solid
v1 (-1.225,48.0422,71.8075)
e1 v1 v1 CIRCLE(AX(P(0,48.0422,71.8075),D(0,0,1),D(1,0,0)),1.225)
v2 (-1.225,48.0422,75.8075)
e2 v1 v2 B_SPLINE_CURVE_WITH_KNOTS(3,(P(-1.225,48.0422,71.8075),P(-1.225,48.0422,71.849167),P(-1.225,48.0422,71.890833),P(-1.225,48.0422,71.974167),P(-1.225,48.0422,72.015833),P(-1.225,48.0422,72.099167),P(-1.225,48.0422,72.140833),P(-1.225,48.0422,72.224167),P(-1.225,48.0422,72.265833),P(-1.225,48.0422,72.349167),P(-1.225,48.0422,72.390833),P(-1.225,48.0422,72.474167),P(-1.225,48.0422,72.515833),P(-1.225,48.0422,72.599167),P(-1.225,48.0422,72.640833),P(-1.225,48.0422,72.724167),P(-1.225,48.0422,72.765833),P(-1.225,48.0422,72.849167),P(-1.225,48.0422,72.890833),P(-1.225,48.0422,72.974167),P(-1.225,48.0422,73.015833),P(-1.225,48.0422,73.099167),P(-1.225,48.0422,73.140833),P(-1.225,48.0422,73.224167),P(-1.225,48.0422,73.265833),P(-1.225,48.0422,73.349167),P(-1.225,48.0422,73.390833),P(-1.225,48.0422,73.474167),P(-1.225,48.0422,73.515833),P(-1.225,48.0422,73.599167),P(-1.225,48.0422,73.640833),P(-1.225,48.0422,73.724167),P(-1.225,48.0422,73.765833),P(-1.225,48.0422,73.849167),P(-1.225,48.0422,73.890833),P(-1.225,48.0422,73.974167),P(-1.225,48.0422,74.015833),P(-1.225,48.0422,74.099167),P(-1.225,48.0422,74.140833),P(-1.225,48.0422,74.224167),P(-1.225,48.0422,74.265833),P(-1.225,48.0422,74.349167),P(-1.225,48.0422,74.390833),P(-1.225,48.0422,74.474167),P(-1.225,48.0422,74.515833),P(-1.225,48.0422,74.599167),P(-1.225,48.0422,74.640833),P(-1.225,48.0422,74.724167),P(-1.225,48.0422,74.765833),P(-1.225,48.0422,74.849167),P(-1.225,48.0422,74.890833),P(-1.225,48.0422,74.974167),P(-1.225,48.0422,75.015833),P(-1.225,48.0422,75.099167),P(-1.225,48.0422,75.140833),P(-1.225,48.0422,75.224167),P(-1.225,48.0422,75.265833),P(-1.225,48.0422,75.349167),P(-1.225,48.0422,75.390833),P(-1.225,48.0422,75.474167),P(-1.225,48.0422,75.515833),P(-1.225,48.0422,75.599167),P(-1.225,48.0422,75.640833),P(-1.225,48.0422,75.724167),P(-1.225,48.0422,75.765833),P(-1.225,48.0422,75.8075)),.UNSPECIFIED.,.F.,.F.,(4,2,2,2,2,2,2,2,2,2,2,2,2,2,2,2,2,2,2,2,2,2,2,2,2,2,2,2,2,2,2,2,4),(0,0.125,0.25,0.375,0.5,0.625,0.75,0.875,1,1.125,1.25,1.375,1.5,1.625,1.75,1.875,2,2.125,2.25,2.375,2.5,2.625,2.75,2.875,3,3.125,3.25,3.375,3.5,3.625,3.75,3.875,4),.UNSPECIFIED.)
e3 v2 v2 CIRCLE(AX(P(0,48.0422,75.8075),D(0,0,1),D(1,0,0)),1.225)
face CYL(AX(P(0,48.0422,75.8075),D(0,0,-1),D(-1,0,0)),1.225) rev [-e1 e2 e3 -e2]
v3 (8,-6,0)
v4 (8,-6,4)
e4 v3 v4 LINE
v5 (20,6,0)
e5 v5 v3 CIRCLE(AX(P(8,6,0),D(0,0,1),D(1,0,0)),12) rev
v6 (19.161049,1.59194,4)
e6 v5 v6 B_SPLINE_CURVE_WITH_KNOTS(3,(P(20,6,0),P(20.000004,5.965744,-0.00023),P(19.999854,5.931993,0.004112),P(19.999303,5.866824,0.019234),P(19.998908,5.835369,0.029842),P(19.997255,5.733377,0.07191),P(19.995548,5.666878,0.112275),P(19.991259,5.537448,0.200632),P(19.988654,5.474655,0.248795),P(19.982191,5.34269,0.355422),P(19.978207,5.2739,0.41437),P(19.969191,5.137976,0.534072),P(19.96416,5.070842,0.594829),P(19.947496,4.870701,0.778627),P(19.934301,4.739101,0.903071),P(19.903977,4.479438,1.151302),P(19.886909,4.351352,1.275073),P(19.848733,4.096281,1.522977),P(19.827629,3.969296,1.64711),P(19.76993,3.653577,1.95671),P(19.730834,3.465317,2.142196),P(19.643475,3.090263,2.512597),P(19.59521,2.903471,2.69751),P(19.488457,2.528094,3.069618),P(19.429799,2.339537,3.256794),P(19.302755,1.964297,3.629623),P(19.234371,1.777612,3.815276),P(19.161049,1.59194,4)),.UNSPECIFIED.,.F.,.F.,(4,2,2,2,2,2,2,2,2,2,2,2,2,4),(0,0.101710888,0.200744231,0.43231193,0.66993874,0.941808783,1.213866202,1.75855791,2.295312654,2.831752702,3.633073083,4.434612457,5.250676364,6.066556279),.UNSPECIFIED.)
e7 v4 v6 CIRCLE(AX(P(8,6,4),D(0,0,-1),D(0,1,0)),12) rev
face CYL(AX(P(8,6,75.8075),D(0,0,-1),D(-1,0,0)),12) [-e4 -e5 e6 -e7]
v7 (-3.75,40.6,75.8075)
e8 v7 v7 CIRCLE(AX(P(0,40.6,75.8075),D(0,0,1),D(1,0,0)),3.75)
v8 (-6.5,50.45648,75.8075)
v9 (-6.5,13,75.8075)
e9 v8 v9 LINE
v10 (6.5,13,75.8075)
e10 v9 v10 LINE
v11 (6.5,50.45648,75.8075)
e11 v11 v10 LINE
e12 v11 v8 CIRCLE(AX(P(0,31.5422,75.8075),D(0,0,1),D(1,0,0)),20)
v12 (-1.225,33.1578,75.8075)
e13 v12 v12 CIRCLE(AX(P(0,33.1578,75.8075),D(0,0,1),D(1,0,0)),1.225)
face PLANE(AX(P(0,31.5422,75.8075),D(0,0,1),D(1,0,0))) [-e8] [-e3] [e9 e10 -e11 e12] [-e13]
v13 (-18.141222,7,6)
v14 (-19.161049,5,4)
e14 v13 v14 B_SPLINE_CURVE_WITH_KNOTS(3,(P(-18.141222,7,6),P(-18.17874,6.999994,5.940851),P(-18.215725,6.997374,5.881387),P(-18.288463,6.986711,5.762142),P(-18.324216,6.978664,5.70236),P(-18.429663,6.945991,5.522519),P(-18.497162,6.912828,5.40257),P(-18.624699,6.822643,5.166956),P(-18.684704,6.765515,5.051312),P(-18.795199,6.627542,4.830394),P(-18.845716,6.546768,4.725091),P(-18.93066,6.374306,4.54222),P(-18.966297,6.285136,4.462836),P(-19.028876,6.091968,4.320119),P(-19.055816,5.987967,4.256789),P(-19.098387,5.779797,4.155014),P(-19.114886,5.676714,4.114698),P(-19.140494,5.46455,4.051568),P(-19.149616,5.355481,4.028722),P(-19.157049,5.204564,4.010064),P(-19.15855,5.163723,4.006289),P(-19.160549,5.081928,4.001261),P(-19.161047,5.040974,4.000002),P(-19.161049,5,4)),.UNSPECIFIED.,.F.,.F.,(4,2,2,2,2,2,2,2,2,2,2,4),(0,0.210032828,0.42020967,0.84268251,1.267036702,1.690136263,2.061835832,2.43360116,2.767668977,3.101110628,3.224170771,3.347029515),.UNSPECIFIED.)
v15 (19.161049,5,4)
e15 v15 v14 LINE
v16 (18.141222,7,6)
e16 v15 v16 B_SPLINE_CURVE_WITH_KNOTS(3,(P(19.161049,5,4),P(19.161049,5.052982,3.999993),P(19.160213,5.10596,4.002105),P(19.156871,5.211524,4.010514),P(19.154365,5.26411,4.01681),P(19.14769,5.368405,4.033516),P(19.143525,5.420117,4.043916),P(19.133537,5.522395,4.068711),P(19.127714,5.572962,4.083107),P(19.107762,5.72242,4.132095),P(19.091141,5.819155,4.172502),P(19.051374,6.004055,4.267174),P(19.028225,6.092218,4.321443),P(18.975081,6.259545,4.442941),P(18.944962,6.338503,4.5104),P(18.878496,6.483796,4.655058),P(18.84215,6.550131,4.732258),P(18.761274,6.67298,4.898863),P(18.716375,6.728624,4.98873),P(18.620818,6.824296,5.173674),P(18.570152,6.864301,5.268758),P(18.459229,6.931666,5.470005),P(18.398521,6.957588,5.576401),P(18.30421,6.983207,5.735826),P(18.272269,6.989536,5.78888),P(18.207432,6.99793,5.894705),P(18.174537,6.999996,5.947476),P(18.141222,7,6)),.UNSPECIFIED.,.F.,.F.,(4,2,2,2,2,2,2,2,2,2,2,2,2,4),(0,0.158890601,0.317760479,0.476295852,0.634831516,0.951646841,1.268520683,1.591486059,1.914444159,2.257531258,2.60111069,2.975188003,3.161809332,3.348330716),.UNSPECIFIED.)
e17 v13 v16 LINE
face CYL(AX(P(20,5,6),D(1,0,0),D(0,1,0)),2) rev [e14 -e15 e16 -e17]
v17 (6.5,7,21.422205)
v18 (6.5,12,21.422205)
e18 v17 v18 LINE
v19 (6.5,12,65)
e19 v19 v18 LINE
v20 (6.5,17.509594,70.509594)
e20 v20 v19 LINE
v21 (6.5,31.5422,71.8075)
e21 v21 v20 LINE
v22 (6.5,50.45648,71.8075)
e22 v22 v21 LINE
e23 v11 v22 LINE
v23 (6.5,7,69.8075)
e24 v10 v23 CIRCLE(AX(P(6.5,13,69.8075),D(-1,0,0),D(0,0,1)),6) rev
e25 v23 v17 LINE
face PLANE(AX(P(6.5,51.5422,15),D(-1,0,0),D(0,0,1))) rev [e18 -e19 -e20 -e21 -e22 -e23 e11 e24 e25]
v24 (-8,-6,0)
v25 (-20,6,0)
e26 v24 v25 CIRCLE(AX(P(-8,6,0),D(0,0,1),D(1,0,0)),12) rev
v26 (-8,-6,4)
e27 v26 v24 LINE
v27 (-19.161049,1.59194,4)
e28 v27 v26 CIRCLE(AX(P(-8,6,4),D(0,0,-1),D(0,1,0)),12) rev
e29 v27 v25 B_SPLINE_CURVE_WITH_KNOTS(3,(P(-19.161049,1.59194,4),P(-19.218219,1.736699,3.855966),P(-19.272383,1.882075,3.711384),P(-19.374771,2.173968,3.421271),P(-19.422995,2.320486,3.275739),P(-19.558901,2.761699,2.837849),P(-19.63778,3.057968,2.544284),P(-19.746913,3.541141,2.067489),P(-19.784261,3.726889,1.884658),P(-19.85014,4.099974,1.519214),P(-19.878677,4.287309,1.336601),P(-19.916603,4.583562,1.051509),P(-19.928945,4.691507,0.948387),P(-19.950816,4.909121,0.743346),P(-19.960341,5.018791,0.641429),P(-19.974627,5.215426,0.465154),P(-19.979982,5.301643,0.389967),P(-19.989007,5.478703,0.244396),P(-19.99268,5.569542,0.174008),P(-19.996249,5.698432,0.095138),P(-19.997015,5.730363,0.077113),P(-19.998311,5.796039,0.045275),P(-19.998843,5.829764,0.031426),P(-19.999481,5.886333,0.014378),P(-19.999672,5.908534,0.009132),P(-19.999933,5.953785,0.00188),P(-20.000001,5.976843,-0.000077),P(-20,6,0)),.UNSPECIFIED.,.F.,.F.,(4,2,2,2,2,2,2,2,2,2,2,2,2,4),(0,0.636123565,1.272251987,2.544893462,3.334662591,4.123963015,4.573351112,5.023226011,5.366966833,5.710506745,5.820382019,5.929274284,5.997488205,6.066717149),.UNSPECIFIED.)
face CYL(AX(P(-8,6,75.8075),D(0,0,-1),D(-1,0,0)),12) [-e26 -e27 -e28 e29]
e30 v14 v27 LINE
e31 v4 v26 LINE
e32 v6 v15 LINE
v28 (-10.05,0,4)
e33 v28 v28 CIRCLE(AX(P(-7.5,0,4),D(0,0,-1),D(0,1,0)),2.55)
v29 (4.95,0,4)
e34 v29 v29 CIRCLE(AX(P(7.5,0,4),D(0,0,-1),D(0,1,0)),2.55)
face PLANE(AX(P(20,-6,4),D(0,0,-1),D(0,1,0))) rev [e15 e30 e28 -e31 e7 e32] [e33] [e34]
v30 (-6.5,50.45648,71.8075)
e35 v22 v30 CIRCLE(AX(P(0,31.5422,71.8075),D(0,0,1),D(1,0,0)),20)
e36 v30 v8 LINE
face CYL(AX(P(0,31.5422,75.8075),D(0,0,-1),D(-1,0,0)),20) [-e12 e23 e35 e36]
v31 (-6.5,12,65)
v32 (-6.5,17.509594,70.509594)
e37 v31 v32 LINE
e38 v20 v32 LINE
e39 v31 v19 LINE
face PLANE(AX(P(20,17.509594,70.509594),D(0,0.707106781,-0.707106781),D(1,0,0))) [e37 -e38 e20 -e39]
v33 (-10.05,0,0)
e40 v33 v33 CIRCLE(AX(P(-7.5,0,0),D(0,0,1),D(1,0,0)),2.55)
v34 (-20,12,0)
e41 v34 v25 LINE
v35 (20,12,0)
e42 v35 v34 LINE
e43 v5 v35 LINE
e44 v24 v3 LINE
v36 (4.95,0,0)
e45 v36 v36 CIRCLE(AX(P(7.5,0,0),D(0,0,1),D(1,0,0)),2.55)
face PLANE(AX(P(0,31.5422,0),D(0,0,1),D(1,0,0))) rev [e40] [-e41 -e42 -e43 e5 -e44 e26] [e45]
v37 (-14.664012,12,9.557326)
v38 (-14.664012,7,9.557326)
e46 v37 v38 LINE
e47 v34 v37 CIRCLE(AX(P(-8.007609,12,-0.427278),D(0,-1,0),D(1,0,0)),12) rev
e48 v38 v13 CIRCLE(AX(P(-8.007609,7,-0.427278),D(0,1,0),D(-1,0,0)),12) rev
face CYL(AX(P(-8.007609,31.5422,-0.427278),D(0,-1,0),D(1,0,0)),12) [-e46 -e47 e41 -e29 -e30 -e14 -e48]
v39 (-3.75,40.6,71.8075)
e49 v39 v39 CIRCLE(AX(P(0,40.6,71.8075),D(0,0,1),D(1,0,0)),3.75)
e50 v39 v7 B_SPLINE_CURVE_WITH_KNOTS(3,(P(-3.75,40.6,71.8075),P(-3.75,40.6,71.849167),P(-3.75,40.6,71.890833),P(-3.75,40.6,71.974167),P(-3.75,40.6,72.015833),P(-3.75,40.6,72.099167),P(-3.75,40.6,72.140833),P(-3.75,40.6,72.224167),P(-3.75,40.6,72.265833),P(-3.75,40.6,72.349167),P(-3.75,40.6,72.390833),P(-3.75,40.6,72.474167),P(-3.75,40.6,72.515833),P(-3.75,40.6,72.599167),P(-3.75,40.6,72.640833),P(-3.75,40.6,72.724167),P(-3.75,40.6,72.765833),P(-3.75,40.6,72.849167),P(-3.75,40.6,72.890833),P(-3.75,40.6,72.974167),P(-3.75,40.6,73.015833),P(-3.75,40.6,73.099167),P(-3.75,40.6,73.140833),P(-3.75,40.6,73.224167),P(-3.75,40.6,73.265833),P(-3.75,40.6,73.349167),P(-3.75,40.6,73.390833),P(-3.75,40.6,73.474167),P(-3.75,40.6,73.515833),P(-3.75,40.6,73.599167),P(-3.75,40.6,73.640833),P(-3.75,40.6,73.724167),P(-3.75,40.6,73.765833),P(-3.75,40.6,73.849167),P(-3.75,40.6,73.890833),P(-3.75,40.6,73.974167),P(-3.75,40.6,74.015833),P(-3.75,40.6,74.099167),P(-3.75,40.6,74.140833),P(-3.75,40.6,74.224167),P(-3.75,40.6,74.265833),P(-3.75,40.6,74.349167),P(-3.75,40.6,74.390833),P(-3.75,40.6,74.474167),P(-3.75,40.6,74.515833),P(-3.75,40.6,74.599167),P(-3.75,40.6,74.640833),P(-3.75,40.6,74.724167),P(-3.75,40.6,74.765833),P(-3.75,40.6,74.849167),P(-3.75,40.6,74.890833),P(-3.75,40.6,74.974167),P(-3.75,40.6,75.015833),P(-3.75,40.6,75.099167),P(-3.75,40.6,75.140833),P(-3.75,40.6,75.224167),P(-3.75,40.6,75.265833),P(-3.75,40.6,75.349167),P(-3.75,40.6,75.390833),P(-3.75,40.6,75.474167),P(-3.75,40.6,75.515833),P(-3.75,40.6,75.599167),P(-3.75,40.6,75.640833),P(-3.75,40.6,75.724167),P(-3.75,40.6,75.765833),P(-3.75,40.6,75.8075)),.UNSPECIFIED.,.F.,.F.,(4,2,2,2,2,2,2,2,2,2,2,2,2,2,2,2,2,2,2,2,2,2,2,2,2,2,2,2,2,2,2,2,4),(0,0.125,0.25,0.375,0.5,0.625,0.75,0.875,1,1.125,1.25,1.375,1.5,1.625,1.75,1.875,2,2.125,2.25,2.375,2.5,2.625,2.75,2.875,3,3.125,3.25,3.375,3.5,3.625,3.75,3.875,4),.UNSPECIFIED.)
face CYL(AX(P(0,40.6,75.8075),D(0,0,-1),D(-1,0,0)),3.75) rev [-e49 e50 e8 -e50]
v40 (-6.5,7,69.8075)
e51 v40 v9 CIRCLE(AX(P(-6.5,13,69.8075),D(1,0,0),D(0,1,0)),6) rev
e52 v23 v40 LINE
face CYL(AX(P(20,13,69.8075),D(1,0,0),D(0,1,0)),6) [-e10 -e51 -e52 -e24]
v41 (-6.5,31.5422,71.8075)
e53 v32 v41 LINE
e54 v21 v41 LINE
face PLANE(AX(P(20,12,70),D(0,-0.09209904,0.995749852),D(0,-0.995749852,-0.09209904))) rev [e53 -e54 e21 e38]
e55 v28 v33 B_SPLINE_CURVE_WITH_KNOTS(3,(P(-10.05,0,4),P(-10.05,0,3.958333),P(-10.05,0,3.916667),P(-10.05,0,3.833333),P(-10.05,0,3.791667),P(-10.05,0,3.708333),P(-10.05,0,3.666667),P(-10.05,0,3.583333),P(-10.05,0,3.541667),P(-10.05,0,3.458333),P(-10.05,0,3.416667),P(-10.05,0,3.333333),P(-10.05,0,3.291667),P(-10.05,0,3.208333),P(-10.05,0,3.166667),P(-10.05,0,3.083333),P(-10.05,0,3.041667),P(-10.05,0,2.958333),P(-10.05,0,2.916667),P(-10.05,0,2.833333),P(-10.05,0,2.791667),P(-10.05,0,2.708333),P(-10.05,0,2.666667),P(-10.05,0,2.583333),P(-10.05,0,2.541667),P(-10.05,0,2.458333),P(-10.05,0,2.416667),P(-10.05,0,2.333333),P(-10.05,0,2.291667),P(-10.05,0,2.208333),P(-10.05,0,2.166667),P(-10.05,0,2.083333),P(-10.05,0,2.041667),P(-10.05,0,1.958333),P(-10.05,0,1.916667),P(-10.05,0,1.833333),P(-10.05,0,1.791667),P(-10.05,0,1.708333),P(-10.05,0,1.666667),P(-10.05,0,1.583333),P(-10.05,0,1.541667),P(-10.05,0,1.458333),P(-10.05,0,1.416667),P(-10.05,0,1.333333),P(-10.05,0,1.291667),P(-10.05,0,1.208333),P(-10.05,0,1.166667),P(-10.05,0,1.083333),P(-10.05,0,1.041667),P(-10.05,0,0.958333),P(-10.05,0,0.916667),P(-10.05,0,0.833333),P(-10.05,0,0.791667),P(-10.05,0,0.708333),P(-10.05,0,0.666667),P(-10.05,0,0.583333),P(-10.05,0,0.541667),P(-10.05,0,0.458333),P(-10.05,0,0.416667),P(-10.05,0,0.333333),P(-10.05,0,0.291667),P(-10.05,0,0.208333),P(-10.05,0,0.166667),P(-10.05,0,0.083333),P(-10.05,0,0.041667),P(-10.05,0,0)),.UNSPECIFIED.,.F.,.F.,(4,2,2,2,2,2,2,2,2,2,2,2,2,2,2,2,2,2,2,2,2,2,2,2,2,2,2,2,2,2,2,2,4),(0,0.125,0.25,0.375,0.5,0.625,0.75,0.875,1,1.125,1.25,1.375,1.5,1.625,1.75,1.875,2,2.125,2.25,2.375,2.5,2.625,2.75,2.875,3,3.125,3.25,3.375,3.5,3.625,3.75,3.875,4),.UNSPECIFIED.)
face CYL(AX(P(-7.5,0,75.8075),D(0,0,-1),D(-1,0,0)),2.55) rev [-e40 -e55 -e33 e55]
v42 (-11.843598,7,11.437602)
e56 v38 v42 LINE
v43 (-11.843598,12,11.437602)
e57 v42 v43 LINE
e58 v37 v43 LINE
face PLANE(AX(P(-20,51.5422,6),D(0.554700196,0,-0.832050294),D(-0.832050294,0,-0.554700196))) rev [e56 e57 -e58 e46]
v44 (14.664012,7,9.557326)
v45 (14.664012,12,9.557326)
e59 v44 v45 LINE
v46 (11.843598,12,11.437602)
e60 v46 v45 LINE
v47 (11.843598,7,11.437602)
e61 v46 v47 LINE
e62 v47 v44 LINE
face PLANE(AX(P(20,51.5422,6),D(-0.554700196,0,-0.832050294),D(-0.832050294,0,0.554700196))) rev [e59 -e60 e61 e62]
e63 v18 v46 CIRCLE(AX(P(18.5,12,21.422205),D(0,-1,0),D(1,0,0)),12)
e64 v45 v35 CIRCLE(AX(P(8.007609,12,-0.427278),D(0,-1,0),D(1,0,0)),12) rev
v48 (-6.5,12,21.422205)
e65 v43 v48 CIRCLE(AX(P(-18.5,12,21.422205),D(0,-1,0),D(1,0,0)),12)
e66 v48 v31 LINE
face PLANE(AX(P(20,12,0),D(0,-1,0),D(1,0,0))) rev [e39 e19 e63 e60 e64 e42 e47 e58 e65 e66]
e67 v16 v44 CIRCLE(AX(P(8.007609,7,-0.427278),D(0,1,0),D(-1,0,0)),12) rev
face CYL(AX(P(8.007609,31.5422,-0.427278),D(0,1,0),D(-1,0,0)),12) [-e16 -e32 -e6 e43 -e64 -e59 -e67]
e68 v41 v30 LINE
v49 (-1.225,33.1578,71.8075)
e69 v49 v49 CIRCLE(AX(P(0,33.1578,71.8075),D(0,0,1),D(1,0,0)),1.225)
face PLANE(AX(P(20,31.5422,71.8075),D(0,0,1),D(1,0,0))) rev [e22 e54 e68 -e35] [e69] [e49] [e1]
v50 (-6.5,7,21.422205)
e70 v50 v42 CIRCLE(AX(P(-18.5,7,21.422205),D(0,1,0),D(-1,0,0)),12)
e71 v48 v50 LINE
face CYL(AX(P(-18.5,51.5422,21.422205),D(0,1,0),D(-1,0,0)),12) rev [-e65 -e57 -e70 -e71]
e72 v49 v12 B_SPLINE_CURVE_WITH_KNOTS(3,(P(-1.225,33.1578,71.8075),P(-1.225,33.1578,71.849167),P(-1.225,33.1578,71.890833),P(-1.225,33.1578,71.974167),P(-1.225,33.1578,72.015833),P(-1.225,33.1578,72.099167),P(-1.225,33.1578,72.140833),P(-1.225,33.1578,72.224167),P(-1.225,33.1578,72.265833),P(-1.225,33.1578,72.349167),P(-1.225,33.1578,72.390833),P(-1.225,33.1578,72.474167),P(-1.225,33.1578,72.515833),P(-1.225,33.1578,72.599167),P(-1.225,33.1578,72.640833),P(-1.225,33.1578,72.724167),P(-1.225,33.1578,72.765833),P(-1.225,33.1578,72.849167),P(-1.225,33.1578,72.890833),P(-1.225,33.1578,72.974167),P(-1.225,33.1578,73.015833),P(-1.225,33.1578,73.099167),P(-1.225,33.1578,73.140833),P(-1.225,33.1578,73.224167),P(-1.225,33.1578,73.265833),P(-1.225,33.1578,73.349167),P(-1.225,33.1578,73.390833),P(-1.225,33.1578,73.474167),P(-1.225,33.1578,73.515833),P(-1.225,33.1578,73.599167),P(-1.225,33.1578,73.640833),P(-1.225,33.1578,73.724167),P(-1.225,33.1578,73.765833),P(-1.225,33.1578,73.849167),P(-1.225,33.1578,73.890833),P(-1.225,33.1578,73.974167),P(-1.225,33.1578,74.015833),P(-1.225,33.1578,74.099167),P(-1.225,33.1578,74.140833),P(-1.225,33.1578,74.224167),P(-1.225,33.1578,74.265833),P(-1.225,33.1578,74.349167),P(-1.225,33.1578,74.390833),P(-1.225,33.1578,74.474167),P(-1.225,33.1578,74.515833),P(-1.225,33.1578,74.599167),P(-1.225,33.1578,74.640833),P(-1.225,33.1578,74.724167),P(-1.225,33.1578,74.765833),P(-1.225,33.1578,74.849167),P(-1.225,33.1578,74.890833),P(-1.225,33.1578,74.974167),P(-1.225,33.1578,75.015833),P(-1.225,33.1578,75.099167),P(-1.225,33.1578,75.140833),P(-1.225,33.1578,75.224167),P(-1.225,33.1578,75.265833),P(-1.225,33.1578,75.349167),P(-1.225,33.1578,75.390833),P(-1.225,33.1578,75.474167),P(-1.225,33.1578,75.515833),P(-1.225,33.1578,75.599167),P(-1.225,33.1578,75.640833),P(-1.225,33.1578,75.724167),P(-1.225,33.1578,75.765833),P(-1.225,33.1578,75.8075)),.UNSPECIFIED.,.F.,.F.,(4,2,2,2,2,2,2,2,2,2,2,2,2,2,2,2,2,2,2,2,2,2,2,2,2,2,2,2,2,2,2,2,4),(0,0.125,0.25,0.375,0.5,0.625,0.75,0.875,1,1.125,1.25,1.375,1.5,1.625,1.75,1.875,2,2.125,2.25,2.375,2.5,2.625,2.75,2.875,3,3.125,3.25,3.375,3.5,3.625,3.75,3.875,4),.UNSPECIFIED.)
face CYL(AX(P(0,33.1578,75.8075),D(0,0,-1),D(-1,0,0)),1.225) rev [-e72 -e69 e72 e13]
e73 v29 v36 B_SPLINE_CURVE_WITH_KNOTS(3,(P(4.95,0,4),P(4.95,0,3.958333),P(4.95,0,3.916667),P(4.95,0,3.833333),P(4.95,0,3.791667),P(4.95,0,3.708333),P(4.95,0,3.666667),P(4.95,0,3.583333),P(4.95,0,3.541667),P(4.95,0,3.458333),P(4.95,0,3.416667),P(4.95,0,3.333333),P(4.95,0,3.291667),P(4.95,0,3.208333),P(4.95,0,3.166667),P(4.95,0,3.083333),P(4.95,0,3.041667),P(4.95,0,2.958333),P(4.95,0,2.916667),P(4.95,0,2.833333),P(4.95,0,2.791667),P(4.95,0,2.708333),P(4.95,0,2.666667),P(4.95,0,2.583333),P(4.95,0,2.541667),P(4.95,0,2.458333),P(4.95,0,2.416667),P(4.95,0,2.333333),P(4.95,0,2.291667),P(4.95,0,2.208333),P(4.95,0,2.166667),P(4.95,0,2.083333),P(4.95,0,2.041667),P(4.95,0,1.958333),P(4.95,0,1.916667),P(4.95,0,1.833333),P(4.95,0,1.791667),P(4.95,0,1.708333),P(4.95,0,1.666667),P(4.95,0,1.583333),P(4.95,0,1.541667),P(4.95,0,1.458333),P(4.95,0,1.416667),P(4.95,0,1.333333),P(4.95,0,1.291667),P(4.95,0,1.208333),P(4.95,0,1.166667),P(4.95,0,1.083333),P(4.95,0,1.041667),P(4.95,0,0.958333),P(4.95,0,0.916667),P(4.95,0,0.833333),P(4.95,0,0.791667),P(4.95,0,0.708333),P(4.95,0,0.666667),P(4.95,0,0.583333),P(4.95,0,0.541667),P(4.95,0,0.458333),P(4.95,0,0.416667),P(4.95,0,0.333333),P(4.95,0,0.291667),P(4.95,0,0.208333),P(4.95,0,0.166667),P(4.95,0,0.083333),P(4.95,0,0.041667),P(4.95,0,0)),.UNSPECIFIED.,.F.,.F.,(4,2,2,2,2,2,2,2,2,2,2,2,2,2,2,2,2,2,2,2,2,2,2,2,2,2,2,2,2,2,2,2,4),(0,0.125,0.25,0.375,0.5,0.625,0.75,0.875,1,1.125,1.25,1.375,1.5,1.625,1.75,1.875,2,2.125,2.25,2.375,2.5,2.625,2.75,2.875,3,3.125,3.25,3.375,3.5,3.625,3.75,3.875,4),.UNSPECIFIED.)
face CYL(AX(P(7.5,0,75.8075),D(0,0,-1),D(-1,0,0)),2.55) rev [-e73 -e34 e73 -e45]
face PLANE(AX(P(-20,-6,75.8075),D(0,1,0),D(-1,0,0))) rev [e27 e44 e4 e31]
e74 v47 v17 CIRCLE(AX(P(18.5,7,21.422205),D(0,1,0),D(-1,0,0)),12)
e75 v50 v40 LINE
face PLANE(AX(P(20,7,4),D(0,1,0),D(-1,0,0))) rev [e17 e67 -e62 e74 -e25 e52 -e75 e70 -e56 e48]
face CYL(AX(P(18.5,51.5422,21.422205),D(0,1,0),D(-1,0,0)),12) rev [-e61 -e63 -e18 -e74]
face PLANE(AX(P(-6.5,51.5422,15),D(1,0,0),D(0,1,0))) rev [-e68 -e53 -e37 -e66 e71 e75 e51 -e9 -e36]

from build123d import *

# Parameters (mm, degrees)
CROQUIS2_R              = 2.55
CROQUIS2_R_2            = 3.75
CROQUIS2_R_3            = 1.225
SALIENTE_EXTRUIR1_DEPTH = 75.8075
CORTAR_EXTRUIR1_DEPTH   = 101.016875761
CROQUIS5_W              = 71.8075
CROQUIS5_H              = 13
CORTAR_EXTRUIR2_DEPTH   = 101.016875761
REDONDEO1_R             = 2
CHAFL_N1_SIZE           = 5
CHAFL_N1_SIZE2          = 5.533110727
REDONDEO2_R             = 12
CORTAR_EXTRUIR3_DEPTH   = 91.170863593
REDONDEO3_R             = 12
REDONDEO4_R             = 6


with BuildPart() as part:
    # Croquis2 → Saliente-Extruir1 (new body)
    with BuildSketch(Plane.XY):
        with BuildLine():
            Line((-20, 31.5422), (-20, -6))
            Line((-20, -6), (20, -6))
            Line((20, -6), (20, 31.5422))
            ThreePointArc((20, 31.5422), (14.142135624, 45.684335624), (0, 51.5422))
            ThreePointArc((0, 51.5422), (-14.142135624, 45.684335624), (-20, 31.5422))
        make_face()
        with Locations(Location((-7.5, 0, 0), (0, 0, 180))):
            Circle(CROQUIS2_R, mode=Mode.SUBTRACT)
        with Locations(Location((7.5, 0, 0), (0, 0, 180))):
            Circle(CROQUIS2_R, mode=Mode.SUBTRACT)
        with Locations(Location((0, 40.6, 0), (0, 0, 180))):
            Circle(CROQUIS2_R_2, mode=Mode.SUBTRACT)
        with Locations(Location((0, 48.0422, 0), (0, 0, 180))):
            Circle(CROQUIS2_R_3, mode=Mode.SUBTRACT)
        with Locations(Location((0, 33.1578, 0), (0, 0, 180))):
            Circle(CROQUIS2_R_3, mode=Mode.SUBTRACT)
    extrude(amount=SALIENTE_EXTRUIR1_DEPTH)

    # Croquis4 → Cortar-Extruir1 (cut, through all)
    with BuildSketch(Plane.ZY.offset(20)):
        Polygon((0, 12), (70, 12), (71.8075, 31.5422), (71.8075, 53.713147715), (0, 53.713147715), align=None)
    extrude(amount=-CORTAR_EXTRUIR1_DEPTH, mode=Mode.SUBTRACT)

    # Croquis5 → Cortar-Extruir2 (cut, through all)
    with BuildSketch(Plane.ZY.offset(20)):
        with Locations((39.90375, 0.5)):
            Rectangle(CROQUIS5_W, CROQUIS5_H)
    extrude(amount=-CORTAR_EXTRUIR2_DEPTH, mode=Mode.SUBTRACT)

    # Redondeo1
    redondeo1_edges = [part.edges().sort_by_distance(p)[0] for p in [
        (0, 7, 4),
    ]]
    fillet(redondeo1_edges, radius=REDONDEO1_R)

    # Chaflán1
    chafl_n1_edges = [part.edges().sort_by_distance(p)[0] for p in [
        (0, 12, 70),
    ]]
    chafl_n1_side = [part.faces().sort_by_distance(p)[0] for p in [
        (0, 12, 35),
    ]]
    chamfer(chafl_n1_edges, length=CHAFL_N1_SIZE, length2=CHAFL_N1_SIZE2, reference=chafl_n1_side[0])

    # Redondeo2
    redondeo2_edges = [part.edges().sort_by_distance(p)[0] for p in [
        (20, -6, 2),
        (-20, -6, 2),
    ]]
    fillet(redondeo2_edges, radius=REDONDEO2_R)

    # Croquis7 → Cortar-Extruir3 (cut, through all)
    with BuildSketch(Plane.XZ.offset(-7)):
        Polygon((-20, 6), (-6.5, 15), (-6.5, 75.8075), (-20, 75.8075), align=None)
        Polygon((20, 75.8075), (20, 6), (6.5, 15), (6.5, 75.8075), align=None)
    extrude(amount=-CORTAR_EXTRUIR3_DEPTH, mode=Mode.SUBTRACT)

    # Redondeo3
    # the kernel refuses this fillet: 12 mm, written as the material it adds along each edge
    with BuildSketch(Plane(origin=(-6.5, 7, 15), x_dir=(-0.8320502943378436, 0, -0.5547001962252291), z_dir=(0, 1, 0)), Plane(origin=(6.5, 7, 15), x_dir=(0, 0, 1), z_dir=(0, 1, 0))) as redondeo3_piece_1:
        with BuildLine():
            CenterArc((REDONDEO3_R * 0.535183758488, REDONDEO3_R), REDONDEO3_R, 213.690067526, 56.309932474)
            Line((-REDONDEO3_R * 0.29686653585, REDONDEO3_R * 0.445299803775), (0, 0))
            Line((0, 0), (REDONDEO3_R * 0.535183758488, 0))
        make_face()
    extrude(amount=5)
    # the kernel refuses this fillet: 12 mm, written as the material it takes off along each edge
    with BuildSketch(Plane(origin=(20, -9.032649504, 6), x_dir=(0, 0, -1), z_dir=(0, 1, 0))) as redondeo3_2_piece_1:
        with BuildLine():
            CenterArc((6.427278002, 11.99239065), REDONDEO3_R, 213.690067526, 54.269398965)
            Line((-3.55732553, 5.335988296), (0, 0))
            Line((0, 0), (6, 0))
        make_face()
    extrude(amount=37.065299008, mode=Mode.SUBTRACT)
    with BuildSketch(Plane(origin=(-20, -9.032649504, 6), x_dir=(0, 0, -1), z_dir=(0, 1, 0))) as redondeo3_2_piece_2:
        with BuildLine():
            CenterArc((6.427278002, -11.99239065), REDONDEO3_R, 92.040533509, 54.269398965)
            Line((-3.55732553, -5.335988296), (0, 0))
            Line((0, 0), (6, 0))
        make_face()
    extrude(amount=37.065299008, mode=Mode.SUBTRACT)

    # Redondeo4
    redondeo4_edges = [part.edges().sort_by_distance(p)[0] for p in [
        (0, 7, 75.8075),
    ]]
    fillet(redondeo4_edges, radius=REDONDEO4_R)


solid = part.part
